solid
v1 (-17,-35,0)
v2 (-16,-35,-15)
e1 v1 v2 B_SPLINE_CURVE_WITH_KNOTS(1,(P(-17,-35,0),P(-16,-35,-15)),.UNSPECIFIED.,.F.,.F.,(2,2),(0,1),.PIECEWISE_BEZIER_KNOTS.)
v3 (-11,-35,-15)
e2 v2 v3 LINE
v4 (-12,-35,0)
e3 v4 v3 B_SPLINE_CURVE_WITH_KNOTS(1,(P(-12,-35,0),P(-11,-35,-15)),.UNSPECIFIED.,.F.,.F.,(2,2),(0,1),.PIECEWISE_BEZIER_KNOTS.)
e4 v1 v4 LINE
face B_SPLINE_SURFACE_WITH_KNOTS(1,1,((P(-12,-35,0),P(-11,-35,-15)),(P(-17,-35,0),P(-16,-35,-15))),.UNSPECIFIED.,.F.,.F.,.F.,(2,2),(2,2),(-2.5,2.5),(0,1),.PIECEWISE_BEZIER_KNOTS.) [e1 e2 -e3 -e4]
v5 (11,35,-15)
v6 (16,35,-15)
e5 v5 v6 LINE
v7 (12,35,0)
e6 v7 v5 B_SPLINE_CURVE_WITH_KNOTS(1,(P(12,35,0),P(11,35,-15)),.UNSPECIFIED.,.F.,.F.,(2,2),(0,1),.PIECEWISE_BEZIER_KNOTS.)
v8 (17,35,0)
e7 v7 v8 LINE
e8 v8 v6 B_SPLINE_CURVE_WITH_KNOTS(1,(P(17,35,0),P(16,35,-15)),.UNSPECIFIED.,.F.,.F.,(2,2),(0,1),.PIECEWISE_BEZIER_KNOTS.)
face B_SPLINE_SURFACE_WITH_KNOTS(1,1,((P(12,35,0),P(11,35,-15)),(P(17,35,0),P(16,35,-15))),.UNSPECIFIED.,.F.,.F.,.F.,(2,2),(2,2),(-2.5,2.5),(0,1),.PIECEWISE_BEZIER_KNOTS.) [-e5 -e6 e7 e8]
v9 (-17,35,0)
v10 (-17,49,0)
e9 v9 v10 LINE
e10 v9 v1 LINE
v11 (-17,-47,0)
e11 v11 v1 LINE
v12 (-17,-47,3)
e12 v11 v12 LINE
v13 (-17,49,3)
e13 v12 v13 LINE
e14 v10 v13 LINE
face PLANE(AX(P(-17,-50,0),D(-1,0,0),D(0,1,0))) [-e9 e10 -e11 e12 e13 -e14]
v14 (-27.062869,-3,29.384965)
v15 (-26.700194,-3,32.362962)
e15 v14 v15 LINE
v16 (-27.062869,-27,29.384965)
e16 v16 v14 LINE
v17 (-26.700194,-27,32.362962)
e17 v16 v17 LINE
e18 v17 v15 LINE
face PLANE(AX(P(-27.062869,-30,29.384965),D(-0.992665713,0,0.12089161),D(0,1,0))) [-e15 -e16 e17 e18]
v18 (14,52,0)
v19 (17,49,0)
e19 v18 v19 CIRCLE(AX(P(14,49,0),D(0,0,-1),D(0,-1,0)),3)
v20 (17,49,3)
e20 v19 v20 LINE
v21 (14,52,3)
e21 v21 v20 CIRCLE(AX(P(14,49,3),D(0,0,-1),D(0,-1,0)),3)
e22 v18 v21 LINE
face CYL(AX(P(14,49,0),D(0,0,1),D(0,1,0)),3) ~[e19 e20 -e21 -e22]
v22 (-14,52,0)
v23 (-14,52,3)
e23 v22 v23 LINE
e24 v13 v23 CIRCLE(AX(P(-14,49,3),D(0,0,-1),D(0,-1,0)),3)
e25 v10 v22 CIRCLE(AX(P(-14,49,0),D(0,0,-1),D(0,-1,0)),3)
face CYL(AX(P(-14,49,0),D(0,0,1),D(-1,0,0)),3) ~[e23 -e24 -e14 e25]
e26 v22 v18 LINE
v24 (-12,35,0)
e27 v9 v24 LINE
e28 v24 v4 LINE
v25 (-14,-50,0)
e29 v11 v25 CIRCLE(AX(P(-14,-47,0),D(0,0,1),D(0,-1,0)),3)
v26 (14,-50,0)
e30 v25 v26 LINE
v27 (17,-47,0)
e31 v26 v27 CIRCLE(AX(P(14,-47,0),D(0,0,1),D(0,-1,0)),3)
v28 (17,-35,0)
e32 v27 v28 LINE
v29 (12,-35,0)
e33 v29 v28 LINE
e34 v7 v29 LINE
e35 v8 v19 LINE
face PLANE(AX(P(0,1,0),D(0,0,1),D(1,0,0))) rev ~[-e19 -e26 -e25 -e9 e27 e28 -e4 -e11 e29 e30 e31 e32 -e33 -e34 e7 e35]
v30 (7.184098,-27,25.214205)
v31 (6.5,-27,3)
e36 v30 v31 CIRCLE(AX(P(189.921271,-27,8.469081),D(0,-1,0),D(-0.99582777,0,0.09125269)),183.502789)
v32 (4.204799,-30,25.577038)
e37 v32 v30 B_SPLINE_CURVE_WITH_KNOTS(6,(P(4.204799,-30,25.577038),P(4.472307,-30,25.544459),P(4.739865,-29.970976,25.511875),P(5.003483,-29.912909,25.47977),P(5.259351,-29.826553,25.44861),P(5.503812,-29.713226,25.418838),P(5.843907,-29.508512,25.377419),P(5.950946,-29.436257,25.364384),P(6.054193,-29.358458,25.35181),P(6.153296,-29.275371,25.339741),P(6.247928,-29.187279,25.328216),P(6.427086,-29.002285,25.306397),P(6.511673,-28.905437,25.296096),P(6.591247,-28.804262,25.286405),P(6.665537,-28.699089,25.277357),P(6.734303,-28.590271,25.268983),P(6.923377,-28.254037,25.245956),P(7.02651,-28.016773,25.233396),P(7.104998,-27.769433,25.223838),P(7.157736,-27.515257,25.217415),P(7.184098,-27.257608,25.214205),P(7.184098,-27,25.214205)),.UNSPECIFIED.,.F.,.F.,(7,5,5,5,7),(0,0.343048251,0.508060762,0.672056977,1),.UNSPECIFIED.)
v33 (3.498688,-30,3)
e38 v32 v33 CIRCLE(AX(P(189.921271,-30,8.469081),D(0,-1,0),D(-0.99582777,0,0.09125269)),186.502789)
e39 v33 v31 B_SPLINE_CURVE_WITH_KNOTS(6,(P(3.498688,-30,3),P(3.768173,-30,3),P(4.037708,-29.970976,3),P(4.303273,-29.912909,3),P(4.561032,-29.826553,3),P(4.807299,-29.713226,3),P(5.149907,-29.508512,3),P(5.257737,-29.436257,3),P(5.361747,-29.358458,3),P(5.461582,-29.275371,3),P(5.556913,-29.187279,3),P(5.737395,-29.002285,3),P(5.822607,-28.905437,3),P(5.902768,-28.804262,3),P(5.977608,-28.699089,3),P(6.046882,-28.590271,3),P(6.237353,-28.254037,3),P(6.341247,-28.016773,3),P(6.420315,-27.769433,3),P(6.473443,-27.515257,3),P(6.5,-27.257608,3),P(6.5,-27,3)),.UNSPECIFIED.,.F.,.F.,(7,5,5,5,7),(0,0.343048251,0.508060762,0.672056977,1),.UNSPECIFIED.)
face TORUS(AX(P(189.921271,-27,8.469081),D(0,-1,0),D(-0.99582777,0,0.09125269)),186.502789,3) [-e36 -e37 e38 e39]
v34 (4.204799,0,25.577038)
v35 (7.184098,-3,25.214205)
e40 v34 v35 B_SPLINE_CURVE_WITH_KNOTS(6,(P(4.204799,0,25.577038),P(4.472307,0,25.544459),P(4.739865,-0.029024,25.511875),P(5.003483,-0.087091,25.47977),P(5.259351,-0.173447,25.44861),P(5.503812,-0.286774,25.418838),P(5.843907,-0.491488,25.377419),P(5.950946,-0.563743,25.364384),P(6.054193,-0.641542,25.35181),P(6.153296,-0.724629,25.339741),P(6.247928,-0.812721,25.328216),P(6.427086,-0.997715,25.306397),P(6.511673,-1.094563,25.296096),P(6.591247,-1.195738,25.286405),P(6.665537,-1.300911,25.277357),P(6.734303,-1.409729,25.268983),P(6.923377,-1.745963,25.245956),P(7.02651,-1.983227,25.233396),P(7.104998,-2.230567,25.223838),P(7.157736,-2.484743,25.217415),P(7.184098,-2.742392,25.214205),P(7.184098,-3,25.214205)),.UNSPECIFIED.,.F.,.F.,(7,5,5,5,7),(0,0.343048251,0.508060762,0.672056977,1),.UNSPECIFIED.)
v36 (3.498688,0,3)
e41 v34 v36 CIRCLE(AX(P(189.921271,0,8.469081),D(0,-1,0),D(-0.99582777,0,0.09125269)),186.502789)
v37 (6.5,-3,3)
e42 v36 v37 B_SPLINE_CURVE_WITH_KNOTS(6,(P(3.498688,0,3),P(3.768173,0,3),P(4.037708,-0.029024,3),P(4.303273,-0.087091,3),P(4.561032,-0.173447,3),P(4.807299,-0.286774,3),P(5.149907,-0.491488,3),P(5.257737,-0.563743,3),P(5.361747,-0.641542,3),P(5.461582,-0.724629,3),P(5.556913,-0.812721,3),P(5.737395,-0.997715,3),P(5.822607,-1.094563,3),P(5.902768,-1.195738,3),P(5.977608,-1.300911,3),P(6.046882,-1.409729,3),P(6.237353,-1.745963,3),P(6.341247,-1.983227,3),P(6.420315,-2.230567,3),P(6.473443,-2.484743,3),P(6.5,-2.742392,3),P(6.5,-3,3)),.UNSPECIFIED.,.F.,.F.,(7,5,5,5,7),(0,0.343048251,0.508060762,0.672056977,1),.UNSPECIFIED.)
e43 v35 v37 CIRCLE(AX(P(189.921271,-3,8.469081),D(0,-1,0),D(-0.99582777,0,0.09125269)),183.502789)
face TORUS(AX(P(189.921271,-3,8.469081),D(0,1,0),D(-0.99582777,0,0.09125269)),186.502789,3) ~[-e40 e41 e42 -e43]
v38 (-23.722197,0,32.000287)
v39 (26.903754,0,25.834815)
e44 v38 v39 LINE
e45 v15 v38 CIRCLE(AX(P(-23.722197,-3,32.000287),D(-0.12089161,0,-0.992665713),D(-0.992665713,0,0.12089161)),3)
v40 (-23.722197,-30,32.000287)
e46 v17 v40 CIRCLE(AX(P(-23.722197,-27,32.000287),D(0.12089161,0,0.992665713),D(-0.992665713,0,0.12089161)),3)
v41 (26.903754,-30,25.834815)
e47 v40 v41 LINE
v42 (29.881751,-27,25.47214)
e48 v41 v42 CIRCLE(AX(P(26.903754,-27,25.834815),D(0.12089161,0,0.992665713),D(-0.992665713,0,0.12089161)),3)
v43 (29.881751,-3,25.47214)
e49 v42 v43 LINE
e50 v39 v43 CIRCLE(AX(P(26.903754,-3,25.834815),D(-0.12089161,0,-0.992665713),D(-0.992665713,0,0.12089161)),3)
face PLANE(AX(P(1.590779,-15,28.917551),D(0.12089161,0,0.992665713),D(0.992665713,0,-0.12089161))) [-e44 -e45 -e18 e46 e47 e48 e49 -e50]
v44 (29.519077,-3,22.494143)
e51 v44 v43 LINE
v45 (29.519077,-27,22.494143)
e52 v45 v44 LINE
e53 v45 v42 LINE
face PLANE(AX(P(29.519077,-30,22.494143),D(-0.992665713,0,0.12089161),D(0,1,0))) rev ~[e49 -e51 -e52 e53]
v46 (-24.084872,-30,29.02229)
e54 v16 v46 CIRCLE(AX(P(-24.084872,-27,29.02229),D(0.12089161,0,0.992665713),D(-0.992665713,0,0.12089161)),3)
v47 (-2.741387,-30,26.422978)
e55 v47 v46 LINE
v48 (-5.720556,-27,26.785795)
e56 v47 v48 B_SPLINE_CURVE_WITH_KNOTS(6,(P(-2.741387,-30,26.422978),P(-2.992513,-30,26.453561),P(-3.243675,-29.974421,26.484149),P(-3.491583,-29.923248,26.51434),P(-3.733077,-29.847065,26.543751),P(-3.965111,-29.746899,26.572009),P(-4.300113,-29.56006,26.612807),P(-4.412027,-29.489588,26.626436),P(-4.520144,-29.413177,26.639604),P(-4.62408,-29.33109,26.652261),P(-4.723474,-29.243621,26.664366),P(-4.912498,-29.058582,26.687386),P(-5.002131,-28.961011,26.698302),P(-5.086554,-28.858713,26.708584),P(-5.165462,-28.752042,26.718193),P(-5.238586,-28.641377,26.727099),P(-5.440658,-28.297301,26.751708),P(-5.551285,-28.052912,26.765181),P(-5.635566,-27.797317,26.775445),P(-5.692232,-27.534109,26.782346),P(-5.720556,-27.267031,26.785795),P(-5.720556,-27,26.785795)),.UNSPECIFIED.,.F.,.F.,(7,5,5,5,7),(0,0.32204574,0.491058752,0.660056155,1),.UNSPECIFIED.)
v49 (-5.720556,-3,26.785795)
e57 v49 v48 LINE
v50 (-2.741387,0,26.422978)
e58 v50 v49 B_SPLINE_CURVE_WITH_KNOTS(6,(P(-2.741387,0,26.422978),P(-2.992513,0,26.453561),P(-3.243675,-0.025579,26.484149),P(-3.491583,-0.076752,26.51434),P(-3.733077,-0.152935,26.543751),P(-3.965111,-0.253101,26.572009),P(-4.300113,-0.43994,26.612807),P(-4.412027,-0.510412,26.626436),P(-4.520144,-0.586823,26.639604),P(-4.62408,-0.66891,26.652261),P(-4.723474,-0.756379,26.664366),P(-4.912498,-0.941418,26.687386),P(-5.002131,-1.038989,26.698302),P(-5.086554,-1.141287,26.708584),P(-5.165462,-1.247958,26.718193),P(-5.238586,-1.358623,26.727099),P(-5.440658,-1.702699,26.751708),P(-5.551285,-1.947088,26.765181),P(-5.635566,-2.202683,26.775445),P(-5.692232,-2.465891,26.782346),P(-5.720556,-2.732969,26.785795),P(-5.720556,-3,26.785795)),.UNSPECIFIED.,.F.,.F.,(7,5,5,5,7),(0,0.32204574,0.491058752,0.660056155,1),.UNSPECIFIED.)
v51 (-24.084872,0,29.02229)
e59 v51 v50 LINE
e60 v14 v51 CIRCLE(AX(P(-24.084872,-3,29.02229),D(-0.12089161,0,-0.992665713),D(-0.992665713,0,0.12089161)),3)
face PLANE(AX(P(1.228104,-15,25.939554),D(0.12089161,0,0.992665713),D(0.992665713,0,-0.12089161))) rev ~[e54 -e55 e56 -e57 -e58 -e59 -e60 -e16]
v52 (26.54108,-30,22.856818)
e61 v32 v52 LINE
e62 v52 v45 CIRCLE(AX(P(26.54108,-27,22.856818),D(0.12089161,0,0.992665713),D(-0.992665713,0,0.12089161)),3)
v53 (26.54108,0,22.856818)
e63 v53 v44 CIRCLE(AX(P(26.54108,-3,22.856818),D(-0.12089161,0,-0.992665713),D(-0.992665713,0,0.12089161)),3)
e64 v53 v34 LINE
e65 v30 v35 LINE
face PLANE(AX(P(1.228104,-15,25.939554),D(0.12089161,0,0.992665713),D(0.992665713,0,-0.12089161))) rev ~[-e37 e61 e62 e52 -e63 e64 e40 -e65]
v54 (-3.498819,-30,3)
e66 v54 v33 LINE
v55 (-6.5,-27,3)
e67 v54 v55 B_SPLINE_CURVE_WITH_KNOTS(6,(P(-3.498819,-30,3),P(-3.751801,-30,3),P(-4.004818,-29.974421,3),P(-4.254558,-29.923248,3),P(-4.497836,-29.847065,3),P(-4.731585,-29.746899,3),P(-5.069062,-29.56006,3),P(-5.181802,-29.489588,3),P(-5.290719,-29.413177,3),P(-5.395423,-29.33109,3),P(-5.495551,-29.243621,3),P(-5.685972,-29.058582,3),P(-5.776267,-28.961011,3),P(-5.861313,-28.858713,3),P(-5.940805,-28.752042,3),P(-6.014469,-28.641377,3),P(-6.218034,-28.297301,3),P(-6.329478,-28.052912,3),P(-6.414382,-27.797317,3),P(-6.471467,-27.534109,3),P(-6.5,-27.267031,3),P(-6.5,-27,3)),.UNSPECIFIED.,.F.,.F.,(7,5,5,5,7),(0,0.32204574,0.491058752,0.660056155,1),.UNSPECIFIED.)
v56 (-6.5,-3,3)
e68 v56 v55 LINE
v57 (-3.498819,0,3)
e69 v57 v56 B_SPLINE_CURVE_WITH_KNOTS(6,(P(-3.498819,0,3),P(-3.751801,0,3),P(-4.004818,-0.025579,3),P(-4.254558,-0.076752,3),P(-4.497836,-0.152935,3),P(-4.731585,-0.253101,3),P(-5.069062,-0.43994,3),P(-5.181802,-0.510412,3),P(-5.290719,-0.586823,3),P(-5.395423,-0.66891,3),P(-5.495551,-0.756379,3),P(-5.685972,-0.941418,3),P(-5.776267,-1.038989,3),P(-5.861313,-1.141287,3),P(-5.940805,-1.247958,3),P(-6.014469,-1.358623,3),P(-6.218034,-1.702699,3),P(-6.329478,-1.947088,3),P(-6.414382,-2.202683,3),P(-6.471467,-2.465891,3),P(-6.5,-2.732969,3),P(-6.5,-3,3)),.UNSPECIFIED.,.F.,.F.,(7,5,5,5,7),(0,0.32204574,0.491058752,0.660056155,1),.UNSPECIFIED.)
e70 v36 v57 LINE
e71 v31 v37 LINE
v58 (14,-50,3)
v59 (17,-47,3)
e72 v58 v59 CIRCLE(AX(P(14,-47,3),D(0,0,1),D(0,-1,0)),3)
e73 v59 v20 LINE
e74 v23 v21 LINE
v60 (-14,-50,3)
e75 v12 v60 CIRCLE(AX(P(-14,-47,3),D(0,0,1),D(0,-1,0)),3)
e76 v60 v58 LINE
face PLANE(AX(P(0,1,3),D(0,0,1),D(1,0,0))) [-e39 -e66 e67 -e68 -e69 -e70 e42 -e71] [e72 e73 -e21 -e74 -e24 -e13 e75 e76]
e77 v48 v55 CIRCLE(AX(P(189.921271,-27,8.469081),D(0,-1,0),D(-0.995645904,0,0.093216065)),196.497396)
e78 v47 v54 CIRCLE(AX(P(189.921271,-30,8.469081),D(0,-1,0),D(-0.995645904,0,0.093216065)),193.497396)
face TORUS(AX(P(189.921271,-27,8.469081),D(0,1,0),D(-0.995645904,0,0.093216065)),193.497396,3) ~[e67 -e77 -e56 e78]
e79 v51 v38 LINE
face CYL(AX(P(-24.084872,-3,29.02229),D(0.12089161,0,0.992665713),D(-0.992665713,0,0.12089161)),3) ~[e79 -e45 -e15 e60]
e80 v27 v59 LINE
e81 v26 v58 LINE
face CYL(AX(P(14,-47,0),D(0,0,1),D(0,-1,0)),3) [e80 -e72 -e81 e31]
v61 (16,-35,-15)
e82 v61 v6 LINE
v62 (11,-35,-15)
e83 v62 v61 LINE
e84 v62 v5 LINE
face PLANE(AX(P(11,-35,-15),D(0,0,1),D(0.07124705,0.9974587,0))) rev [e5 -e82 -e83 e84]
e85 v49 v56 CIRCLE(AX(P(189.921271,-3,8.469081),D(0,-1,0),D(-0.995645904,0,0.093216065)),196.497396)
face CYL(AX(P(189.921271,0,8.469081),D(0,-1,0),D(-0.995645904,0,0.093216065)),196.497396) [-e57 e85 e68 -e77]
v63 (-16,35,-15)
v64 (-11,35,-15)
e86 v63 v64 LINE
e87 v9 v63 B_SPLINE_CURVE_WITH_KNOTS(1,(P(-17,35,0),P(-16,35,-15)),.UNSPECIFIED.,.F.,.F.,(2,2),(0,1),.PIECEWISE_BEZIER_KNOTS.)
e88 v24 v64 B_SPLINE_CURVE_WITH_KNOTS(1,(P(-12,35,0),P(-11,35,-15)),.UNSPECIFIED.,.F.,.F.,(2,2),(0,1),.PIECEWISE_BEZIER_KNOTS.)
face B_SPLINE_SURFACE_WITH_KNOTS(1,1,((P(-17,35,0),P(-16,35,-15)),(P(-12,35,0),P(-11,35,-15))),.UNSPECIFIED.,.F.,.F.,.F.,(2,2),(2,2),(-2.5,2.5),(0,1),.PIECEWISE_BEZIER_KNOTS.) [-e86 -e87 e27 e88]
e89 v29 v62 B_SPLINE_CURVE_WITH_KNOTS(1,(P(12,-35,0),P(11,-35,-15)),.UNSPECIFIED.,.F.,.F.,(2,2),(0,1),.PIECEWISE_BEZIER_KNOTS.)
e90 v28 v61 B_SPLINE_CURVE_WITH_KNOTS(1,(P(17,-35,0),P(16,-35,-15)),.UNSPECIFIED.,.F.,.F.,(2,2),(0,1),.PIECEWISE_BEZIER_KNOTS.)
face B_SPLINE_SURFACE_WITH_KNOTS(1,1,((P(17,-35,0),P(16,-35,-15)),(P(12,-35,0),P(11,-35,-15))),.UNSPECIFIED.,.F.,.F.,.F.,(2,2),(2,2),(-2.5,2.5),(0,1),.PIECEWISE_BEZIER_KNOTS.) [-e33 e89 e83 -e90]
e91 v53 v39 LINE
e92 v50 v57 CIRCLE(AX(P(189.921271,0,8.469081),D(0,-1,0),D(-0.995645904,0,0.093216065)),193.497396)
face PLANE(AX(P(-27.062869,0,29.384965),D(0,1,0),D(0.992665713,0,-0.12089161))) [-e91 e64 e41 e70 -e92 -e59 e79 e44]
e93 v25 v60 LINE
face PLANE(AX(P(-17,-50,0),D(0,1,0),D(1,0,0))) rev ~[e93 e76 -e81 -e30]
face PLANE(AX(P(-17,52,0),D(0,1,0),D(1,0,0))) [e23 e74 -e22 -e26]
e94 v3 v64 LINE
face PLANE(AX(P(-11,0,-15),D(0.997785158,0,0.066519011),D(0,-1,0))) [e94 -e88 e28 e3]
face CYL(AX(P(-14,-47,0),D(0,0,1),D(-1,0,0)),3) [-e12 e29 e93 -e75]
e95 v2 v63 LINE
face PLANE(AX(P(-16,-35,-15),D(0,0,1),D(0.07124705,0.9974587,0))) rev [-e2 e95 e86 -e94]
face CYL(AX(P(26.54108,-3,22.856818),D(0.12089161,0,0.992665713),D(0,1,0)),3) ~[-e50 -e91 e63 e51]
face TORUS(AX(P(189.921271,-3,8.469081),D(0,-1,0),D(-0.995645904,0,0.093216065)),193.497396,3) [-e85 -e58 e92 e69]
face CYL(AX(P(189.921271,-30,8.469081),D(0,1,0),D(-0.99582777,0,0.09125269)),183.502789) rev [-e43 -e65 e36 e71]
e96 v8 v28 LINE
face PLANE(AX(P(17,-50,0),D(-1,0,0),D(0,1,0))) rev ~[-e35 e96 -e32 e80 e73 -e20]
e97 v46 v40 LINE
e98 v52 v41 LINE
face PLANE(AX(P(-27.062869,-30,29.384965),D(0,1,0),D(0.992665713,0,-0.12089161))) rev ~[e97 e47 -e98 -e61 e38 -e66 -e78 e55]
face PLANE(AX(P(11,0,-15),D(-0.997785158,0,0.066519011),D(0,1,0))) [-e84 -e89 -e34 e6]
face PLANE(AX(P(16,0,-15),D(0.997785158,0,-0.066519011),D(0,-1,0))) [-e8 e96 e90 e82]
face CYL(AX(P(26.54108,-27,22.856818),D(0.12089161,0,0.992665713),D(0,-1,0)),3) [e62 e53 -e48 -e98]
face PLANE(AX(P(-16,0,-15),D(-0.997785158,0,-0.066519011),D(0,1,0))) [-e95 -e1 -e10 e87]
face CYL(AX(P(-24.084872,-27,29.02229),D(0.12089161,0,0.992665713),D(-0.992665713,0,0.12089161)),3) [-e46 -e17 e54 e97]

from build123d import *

# Parameters (mm, degrees)
F0_W     = 34
F0_H     = 102
F1_DEPTH = 3
F6_W     = 57
F6_H     = 30
F7_DEPTH = 3
F8_R     = 3
F2_W     = 5
F2_H     = 70
F10_W    = 5
F10_H    = 70
F13_R    = 3


# Not quite as in the source:
# - a feature names something its author has since deleted; it is built from what else it names


with BuildPart() as f1:
    # F0 (on Top) → F1 (new body)
    with BuildSketch(Plane.XY):
        with Locations((0, 1)):
            Rectangle(F0_W, F0_H)
    extrude(amount=F1_DEPTH)

    # F5: sweep along a path in F4
    with BuildLine(Plane.XZ) as f5_path:
        ThreePointArc((0.7317709574, 26), (0.0173632461, 14.5110886282), (0, 3))
    # F3 (on face) → F5 (sweep)
    with BuildSketch(Plane.XY.offset(3)):
        Polygon((6.5, 0), (0, 0), (-6.5, 0), (-6.5, -30), (0, -30), (6.5, -30), align=None)
    sweep(path=f5_path.line)

    # F6 (on face) → F7 (join)
    with BuildSketch(Plane(origin=(3.1308235326, 0, 25.7078318269), x_dir=(0.9926657135, 0, -0.1208916099), z_dir=(0.1208916099, 0, 0.9926657135))):
        with Locations((-1.916777917, -15)):
            Rectangle(F6_W, F6_H)
    extrude(amount=F7_DEPTH)

    # F8
    f8_edges = [f1.edges().sort_by_distance(p)[0] for p in [
        (29.700414, -30, 23.983142),
        (29.700414, 0, 23.983142),
        (-26.881532, -30, 30.873964),
        (-26.881532, 0, 30.873964),
    ]]
    fillet(f8_edges, radius=F8_R)

    # F2 (on face) → F11 section 0
    with BuildSketch(Plane(origin=(0, 0, 0), x_dir=(1, 0, 0), z_dir=(0, 0, -1))):
        with Locations((14.5, 0)):
            Rectangle(F2_W, F2_H)
    # F10 (on offset) → F11 section 1
    with BuildSketch(Plane.XY.offset(-15)):
        with Locations((13.5, 0)):
            Rectangle(F10_W, F10_H)
    loft()

    # F2 (on face) → F12 section 0
    with BuildSketch(Plane(origin=(0, 0, 0), x_dir=(1, 0, 0), z_dir=(0, 0, -1))):
        with Locations((-14.5, 0)):
            Rectangle(F2_W, F2_H)
    # F10 (on offset) → F12 section 1
    with BuildSketch(Plane.XY.offset(-15)):
        with Locations((-13.5, 0)):
            Rectangle(F10_W, F10_H)
    loft()

    # F13
    f13_edges = [f1.edges().sort_by_distance(p)[0] for p in [
        (17, -50, 1.5),
        (-17, -50, 1.5),
        (17, 52, 1.5),
        (-17, 52, 1.5),
        (6.505434, -30, 14.117469),
        (-6.470708, -30, 14.904709),
        (6.505434, 0, 14.117469),
        (-6.470708, 0, 14.904709),
    ]]
    fillet(f13_edges, radius=F13_R)


solid = f1.part
